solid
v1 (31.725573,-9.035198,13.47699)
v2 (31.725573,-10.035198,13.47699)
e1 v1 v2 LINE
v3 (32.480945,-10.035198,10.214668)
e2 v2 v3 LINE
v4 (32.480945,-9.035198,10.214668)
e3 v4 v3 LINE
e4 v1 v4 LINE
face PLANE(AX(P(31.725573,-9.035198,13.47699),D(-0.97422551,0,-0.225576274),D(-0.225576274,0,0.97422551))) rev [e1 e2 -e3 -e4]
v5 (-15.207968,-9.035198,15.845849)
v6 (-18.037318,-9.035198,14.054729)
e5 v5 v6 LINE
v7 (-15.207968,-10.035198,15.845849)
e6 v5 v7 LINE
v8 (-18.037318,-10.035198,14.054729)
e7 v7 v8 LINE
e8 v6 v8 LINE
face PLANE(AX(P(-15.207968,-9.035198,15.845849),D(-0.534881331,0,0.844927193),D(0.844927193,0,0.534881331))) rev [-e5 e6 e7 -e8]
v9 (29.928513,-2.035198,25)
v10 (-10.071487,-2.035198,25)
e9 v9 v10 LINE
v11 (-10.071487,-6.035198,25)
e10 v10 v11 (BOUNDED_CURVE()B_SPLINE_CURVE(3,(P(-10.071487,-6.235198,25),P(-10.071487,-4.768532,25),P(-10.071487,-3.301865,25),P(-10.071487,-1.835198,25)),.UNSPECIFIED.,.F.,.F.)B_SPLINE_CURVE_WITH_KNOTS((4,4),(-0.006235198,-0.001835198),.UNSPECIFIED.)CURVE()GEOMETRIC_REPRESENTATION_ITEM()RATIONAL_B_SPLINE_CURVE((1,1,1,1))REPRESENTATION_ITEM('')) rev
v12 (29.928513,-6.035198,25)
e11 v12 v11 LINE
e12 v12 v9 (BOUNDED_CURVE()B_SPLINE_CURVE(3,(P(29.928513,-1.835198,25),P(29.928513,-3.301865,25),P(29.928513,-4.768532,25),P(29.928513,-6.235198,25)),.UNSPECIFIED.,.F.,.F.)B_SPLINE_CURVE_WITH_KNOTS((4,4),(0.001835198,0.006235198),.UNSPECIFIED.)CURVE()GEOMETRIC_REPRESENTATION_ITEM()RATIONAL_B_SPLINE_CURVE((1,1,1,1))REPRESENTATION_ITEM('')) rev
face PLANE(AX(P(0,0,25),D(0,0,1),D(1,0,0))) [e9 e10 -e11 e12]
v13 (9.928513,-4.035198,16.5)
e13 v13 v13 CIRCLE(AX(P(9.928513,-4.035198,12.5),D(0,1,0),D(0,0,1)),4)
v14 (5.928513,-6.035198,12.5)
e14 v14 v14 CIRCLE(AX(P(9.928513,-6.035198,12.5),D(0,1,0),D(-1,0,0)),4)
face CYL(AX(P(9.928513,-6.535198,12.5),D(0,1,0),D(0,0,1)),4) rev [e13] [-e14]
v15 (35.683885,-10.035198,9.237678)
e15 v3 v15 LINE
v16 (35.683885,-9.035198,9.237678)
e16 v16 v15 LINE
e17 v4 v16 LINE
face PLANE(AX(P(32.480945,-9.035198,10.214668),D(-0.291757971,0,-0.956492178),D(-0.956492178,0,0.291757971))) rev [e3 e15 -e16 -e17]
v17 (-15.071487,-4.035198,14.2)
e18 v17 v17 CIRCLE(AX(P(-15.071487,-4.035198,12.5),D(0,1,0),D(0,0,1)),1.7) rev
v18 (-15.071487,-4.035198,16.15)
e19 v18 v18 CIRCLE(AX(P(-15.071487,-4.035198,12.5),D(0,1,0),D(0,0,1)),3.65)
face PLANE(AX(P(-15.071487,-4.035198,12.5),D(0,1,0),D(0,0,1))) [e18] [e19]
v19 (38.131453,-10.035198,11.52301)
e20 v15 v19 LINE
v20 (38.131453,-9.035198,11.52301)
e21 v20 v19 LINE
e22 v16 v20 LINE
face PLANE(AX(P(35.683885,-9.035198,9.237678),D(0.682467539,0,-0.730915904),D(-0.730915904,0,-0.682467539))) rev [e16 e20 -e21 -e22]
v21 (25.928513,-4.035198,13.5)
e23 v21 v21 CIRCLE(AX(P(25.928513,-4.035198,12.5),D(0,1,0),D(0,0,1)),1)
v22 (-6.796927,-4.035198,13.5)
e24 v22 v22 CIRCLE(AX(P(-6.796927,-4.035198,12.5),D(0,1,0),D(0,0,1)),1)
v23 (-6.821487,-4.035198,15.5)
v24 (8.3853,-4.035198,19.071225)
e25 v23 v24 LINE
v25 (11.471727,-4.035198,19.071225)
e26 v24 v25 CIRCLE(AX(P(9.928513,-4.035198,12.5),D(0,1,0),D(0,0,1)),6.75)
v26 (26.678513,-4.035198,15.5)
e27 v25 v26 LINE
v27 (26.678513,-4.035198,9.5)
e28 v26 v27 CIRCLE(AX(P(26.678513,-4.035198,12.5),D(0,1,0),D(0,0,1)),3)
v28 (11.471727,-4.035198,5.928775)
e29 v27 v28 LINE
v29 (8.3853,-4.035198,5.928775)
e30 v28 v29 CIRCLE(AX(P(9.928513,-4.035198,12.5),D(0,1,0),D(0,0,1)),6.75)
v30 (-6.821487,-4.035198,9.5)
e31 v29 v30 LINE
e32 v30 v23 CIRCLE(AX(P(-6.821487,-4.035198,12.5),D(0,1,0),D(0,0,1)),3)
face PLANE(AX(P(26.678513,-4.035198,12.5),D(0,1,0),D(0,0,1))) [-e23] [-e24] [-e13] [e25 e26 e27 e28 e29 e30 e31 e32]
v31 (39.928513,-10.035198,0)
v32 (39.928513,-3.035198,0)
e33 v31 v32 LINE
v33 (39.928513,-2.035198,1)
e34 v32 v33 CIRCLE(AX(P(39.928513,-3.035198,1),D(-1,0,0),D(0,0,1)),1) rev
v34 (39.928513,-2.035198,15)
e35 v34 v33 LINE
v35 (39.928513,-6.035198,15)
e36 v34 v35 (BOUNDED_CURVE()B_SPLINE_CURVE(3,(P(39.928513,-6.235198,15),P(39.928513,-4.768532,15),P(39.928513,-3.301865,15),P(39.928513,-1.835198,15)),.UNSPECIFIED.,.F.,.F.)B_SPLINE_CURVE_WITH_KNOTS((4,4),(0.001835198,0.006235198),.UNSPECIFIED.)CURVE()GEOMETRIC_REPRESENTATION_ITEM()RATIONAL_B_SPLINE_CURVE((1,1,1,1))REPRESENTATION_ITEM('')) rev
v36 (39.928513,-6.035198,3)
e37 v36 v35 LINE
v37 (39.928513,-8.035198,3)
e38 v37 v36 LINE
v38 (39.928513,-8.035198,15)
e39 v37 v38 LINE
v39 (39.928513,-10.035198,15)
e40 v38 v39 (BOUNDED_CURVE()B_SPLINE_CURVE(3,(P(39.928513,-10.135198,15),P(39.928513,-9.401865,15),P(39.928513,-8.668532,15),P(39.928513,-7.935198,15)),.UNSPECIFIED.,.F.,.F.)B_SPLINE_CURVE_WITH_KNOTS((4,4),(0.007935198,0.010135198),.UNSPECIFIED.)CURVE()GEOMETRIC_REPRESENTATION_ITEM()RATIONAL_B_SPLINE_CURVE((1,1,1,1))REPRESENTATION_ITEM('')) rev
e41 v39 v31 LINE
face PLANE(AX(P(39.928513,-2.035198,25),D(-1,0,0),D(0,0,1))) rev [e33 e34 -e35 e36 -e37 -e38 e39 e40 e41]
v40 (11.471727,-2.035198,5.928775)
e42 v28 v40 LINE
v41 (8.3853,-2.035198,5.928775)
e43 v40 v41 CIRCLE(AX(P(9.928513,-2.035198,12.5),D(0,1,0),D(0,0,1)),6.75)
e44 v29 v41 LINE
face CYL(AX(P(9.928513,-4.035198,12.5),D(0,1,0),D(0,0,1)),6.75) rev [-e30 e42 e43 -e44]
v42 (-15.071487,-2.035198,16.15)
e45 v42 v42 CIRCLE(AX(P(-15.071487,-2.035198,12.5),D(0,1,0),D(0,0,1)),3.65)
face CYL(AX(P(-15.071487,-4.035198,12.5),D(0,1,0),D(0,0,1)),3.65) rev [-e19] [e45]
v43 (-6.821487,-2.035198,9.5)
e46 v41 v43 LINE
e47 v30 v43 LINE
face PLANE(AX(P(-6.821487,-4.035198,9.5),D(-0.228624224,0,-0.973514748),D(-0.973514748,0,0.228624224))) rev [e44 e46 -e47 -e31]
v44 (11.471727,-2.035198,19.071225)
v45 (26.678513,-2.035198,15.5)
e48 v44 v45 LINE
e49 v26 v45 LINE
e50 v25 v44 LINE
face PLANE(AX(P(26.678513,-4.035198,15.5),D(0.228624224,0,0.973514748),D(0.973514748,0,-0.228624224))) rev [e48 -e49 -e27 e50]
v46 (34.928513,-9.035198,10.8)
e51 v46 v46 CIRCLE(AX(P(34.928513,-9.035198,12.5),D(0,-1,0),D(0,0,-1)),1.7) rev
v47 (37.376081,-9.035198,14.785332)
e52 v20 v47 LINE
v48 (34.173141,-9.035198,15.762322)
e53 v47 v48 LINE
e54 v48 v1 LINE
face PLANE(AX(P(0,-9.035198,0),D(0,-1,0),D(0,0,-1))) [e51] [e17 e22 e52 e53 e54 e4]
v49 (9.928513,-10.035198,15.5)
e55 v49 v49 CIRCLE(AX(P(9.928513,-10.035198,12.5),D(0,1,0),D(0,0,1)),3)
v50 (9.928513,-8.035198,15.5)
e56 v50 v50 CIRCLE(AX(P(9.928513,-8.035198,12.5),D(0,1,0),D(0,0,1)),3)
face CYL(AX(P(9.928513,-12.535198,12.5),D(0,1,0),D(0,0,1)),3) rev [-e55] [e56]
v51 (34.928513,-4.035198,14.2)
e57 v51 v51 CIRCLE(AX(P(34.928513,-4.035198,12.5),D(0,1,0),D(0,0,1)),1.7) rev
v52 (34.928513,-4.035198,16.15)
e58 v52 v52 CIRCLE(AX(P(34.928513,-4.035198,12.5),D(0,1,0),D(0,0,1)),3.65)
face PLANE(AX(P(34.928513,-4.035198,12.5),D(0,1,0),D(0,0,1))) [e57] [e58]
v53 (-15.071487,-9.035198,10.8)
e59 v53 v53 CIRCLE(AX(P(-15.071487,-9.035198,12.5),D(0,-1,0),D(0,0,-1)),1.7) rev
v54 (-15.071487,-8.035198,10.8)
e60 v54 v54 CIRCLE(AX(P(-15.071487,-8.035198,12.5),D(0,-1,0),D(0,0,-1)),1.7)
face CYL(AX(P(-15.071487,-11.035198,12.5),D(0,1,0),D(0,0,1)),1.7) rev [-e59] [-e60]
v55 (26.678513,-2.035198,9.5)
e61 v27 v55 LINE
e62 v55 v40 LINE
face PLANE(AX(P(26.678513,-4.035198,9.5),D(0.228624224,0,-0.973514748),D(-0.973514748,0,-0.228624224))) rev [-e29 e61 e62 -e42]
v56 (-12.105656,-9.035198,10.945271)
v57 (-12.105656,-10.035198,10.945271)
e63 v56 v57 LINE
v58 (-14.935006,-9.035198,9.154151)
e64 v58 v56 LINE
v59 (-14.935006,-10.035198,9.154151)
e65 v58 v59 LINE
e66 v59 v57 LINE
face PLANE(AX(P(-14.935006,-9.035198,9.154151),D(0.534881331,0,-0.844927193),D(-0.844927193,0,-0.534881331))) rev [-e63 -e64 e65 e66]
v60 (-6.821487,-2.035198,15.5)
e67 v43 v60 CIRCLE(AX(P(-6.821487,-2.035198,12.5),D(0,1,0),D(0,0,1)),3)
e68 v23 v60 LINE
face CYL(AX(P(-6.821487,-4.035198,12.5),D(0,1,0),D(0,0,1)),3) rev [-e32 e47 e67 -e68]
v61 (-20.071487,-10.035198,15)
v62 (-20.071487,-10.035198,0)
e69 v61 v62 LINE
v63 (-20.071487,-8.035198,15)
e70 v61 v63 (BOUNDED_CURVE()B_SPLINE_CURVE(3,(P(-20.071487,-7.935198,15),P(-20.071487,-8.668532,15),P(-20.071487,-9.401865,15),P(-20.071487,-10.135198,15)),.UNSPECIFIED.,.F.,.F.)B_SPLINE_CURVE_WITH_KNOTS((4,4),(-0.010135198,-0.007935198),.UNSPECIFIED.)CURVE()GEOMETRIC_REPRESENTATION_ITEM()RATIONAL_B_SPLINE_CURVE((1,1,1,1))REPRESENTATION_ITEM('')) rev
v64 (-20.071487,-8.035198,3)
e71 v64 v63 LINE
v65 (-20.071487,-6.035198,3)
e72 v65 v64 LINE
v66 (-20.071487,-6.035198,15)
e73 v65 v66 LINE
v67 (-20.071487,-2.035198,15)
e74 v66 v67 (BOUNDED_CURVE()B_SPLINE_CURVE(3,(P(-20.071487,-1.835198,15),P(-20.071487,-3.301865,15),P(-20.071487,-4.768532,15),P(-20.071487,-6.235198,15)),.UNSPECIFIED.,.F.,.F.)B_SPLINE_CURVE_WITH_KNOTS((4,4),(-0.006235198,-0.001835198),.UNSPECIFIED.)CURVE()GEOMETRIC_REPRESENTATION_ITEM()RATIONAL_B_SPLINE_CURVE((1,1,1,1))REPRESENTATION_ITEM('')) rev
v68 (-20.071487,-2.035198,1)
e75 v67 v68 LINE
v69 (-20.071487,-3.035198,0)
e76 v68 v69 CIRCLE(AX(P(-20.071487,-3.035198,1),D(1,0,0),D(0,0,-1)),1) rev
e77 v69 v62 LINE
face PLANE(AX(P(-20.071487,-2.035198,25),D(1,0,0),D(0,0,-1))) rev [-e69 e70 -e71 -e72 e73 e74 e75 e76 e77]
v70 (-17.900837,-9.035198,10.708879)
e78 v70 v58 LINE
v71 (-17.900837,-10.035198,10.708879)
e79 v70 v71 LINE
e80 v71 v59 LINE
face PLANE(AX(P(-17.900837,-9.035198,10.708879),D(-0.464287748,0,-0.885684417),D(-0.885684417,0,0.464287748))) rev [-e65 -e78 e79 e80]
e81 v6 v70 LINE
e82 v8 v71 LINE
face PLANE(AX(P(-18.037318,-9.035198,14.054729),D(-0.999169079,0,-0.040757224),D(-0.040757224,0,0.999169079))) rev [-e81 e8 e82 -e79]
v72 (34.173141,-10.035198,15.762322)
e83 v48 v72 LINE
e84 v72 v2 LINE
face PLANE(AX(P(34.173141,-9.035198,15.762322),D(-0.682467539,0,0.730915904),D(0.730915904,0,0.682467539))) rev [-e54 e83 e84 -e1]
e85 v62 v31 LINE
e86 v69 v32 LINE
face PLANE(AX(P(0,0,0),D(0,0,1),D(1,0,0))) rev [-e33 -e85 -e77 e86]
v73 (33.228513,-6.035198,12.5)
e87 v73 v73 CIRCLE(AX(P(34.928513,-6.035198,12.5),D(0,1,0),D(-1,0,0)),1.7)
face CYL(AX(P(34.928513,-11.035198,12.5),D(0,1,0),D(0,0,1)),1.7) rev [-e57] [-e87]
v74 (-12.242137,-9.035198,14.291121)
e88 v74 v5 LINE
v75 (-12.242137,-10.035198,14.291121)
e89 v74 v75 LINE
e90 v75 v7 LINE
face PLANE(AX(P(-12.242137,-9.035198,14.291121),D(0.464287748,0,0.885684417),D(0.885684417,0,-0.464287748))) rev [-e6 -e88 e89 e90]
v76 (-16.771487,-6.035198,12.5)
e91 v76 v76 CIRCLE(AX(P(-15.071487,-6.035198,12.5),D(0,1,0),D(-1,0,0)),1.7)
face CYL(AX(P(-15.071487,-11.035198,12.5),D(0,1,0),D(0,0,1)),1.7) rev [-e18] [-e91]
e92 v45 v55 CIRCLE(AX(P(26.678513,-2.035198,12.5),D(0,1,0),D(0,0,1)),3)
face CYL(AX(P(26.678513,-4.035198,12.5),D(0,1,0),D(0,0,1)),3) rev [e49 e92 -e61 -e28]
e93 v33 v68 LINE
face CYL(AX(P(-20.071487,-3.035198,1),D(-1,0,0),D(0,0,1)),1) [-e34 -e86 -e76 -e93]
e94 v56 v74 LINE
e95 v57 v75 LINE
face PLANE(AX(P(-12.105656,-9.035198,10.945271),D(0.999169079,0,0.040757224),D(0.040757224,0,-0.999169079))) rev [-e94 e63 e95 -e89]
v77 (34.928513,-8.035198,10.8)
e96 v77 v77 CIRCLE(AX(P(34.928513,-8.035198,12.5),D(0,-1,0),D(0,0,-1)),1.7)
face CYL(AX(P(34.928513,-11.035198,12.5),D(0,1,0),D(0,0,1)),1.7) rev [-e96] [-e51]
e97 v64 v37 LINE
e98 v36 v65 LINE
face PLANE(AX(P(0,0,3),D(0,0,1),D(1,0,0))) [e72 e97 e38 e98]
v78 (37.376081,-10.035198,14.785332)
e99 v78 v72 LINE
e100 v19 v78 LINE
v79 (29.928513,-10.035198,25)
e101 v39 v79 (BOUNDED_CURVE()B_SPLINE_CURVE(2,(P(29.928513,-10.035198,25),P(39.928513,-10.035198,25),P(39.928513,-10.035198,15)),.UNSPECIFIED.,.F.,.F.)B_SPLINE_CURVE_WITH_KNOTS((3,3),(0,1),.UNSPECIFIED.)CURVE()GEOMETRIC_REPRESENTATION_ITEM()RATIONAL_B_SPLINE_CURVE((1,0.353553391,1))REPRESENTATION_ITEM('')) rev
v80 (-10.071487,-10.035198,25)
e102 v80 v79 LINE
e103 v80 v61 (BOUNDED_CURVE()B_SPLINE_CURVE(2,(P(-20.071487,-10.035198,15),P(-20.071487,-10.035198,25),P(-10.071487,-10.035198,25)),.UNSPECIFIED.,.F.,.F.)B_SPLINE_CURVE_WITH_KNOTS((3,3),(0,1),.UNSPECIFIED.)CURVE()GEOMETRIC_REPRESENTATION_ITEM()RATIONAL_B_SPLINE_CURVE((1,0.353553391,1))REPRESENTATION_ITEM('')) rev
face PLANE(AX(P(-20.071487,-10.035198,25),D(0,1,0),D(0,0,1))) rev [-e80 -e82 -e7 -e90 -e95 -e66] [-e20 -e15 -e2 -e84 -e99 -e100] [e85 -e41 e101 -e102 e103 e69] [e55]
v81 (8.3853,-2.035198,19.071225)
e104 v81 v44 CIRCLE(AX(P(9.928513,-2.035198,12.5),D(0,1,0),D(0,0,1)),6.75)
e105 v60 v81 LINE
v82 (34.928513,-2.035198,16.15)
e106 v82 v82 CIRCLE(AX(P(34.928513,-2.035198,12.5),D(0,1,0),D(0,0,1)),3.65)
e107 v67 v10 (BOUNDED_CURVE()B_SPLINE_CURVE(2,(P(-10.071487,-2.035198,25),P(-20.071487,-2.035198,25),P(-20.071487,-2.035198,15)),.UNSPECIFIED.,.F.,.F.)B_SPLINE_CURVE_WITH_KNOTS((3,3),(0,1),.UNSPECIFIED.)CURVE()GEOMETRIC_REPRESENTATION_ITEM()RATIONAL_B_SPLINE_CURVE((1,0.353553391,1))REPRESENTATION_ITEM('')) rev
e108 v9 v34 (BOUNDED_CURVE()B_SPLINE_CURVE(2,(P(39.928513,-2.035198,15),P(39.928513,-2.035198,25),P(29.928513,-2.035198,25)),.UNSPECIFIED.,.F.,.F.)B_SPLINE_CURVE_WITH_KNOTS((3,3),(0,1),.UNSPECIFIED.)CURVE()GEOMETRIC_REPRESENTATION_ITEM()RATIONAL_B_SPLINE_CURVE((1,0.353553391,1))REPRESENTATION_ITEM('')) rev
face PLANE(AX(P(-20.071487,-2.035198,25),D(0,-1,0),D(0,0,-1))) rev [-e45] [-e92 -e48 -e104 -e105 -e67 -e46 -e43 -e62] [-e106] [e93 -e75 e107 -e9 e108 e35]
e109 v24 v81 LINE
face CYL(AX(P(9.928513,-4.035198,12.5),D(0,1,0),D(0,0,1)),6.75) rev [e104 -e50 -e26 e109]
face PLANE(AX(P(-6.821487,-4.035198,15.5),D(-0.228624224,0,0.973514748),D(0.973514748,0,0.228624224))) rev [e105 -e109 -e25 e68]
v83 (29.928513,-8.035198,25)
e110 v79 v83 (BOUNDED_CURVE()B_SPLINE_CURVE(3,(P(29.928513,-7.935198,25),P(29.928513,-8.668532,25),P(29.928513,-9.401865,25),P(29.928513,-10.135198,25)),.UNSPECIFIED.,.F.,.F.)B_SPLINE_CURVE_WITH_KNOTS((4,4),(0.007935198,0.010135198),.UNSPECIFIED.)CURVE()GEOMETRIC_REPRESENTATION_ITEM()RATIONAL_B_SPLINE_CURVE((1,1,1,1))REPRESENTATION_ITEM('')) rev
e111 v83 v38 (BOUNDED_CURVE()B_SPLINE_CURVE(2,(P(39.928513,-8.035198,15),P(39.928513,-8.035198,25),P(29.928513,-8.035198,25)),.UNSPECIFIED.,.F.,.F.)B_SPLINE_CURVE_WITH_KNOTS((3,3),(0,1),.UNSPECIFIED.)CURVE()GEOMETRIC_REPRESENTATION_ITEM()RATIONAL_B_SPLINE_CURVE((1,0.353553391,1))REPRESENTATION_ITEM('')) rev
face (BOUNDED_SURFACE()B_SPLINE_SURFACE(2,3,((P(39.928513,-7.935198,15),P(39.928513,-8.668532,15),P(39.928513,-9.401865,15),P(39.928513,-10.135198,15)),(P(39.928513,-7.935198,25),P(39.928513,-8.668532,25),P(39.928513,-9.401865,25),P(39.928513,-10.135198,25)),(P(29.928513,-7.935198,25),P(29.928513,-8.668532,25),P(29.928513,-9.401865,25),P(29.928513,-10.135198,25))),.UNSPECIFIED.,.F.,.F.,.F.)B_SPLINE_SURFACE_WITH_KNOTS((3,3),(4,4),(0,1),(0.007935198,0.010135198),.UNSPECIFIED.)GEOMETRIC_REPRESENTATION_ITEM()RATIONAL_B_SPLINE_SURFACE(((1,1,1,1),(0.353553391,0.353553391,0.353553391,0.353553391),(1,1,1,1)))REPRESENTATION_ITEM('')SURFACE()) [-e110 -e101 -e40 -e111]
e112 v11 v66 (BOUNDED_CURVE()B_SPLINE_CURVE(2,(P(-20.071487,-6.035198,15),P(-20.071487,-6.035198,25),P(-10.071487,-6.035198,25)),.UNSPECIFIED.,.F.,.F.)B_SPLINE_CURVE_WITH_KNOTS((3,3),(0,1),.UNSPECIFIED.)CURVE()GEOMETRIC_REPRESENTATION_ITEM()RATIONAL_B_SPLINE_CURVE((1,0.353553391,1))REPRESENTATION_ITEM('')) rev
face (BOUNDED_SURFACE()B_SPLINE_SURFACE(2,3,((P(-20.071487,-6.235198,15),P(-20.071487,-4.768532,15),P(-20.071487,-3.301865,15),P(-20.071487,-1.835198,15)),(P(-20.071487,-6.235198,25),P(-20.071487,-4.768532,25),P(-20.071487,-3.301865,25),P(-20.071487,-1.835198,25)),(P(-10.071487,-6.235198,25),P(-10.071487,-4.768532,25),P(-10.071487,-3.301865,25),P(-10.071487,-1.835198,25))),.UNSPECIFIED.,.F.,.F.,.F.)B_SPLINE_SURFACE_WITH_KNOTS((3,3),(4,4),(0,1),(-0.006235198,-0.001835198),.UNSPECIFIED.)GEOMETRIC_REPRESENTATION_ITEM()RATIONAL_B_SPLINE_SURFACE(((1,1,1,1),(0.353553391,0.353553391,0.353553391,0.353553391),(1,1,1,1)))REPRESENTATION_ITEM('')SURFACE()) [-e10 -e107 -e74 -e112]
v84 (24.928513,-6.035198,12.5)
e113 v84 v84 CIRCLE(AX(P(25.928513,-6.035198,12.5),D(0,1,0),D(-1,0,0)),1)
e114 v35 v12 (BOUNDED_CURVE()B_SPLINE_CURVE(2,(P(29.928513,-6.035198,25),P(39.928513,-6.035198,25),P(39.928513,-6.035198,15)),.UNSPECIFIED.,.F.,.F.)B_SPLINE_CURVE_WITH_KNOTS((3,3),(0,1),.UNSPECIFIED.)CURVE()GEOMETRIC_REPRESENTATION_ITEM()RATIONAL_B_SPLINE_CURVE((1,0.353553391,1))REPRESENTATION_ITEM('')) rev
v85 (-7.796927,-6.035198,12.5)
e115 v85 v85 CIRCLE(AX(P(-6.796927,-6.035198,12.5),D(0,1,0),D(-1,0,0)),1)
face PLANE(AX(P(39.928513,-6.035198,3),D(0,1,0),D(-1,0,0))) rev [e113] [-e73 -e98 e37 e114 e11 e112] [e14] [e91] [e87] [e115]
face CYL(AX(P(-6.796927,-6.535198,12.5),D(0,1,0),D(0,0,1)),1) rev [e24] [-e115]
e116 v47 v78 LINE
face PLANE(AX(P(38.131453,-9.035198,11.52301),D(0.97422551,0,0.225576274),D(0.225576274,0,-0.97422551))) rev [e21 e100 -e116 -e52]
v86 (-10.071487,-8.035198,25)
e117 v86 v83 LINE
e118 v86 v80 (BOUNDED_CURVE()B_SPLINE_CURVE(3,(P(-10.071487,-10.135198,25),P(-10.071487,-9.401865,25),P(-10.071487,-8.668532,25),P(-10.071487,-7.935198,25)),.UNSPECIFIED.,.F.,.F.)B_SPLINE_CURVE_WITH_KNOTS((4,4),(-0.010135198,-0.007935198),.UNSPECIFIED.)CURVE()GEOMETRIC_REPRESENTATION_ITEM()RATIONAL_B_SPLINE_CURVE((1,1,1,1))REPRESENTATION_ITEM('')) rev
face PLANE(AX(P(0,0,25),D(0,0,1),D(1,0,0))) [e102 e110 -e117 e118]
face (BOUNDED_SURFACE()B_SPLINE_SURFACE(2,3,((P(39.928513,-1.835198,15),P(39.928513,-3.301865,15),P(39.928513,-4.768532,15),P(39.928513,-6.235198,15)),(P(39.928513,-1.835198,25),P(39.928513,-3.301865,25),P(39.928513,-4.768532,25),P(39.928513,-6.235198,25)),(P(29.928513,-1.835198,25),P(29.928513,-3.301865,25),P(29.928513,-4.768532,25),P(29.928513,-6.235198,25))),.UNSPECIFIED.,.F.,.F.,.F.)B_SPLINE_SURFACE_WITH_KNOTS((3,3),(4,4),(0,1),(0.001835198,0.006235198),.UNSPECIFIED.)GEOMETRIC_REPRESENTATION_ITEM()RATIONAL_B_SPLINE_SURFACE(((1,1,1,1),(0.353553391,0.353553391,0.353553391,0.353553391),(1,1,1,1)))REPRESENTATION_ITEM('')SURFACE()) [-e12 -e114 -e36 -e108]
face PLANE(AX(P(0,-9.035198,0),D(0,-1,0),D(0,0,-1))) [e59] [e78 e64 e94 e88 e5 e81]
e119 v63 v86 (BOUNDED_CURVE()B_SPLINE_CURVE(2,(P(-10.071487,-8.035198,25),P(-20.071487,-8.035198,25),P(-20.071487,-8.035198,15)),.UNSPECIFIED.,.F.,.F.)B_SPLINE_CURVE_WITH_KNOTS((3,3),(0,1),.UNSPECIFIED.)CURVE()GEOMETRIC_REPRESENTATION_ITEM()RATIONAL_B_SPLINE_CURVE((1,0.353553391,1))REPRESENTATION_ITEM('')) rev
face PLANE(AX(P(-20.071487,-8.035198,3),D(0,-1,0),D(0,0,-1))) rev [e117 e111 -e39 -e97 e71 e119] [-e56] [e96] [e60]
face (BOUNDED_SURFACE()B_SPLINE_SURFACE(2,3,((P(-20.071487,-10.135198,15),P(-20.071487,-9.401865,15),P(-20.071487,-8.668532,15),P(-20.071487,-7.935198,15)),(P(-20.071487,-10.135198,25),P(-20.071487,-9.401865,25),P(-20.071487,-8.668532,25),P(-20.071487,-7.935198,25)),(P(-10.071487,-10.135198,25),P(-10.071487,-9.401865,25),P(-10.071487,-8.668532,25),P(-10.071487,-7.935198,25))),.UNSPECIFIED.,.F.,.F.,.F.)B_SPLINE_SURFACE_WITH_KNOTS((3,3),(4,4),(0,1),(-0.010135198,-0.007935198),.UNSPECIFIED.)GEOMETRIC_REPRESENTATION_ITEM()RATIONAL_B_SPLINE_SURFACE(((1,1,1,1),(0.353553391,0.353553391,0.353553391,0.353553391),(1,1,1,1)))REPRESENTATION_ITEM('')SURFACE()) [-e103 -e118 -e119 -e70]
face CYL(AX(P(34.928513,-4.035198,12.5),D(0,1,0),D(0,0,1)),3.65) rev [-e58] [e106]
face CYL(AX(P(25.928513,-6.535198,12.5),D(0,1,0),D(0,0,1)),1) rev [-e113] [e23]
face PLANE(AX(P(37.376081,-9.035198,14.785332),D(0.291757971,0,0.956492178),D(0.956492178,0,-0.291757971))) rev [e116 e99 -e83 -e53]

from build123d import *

# Parameters (mm, degrees)
SKETCH1_W           = 60
SKETCH1_H           = 8
BOSS_EXTRUDE1_DEPTH = 25
SKETCH2_W           = 60
SKETCH2_H           = 2
CUT_EXTRUDE1_DEPTH  = 22
CUT_EXTRUDE2_DEPTH  = 2
SKETCH4_R           = 1
SKETCH4_R_2         = 4
CUT_EXTRUDE3_DEPTH  = 2.5
SKETCH5_R           = 1.7
CUT_EXTRUDE4_DEPTH  = 9
FILLET1_R           = 1
FILLET2_SIZE        = 10
SKETCH6_R           = 3
CUT_EXTRUDE5_DEPTH  = 4.5
CUT_EXTRUDE6_DEPTH  = 1
SKETCH8_R           = 3.65
CUT_EXTRUDE7_DEPTH  = 2


with BuildPart() as part:
    # Sketch1 → Boss-Extrude1 (new body)
    with BuildSketch(Plane.XY):
        with Locations((9.92851316, -6.03519833)):
            Rectangle(SKETCH1_W, SKETCH1_H)
    extrude(amount=BOSS_EXTRUDE1_DEPTH)

    # Sketch2 → Cut-Extrude1 (cut)
    with BuildSketch(Plane.XY.offset(25)):
        with Locations((9.92851316, -7.03519833)):
            Rectangle(SKETCH2_W, SKETCH2_H)
    extrude(amount=-CUT_EXTRUDE1_DEPTH, mode=Mode.SUBTRACT)

    # Sketch3 → Cut-Extrude2 (cut)
    with BuildSketch(Plane(origin=(0, -2.03519833, 0), x_dir=(1, 0, 0), z_dir=(0, 1, 0))):
        with BuildLine():
            Line((26.67851316, -9.5), (11.471726674, -5.928775453))
            ThreePointArc((11.471726674, -5.928775453), (9.92851316, -5.75), (8.385299646, -5.928775453))
            Line((8.385299646, -5.928775453), (-6.82148684, -9.5))
            ThreePointArc((-6.82148684, -9.5), (-9.821486841, -12.5), (-6.82148684, -15.5))
            Line((-6.82148684, -15.5), (8.385299646, -19.071224547))
            ThreePointArc((8.385299646, -19.071224547), (9.92851316, -19.25), (11.471726674, -19.071224547))
            Line((11.471726674, -19.071224547), (26.67851316, -15.5))
            ThreePointArc((26.67851316, -15.5), (29.67851316, -12.5), (26.67851316, -9.5))
        make_face()
    extrude(amount=-CUT_EXTRUDE2_DEPTH, mode=Mode.SUBTRACT)

    # Sketch4 → Cut-Extrude3 (cut)
    with BuildSketch(Plane(origin=(0, -4.03519833, 0), x_dir=(1, 0, 0), z_dir=(0, 1, 0))):
        with Locations(Location((-6.796927173, -12.5, 0), (0, 0, 270))):
            Circle(SKETCH4_R)
        with Locations(Location((9.92851316, -12.5, 0), (0, 0, 270))):
            Circle(SKETCH4_R_2)
        with Locations(Location((25.92851316, -12.5, 0), (0, 0, 270))):
            Circle(SKETCH4_R)
    extrude(amount=-CUT_EXTRUDE3_DEPTH, mode=Mode.SUBTRACT)

    # Sketch5 → Cut-Extrude4 (cut)
    with BuildSketch(Plane(origin=(0, -2.03519833, 0), x_dir=(1, 0, 0), z_dir=(0, 1, 0))):
        with Locations(Location((34.92851316, -12.5, 0), (0, 0, 270))):
            Circle(SKETCH5_R)
        with Locations(Location((-15.07148684, -12.5, 0), (0, 0, 270))):
            Circle(SKETCH5_R)
    extrude(amount=-CUT_EXTRUDE4_DEPTH, mode=Mode.SUBTRACT)

    # Fillet1
    fillet1_edges = [part.edges().sort_by_distance(p)[0] for p in [
        (9.92851316, -2.03519833, 0),
    ]]
    fillet(fillet1_edges, radius=FILLET1_R)

    # Fillet2
    # a fillet whose section is not a circle: 10 mm, written as the material it takes off along each edge
    with BuildSketch(Plane(origin=(-20.07148684, -31.03519833, 25), x_dir=(0, 0, -1), z_dir=(0, 1, 0))) as fillet2_piece_1:
        with BuildLine():
            Bezier((FILLET2_SIZE, 0), (0, 0), (0, -FILLET2_SIZE), weights=[1, 0.353553391, 1])
            Line((0, -FILLET2_SIZE), (0, 0))
            Line((0, 0), (FILLET2_SIZE, 0))
        make_face()
    extrude(amount=54, mode=Mode.SUBTRACT)
    with BuildSketch(Plane(origin=(-20.07148684, -35.03519833, 25), x_dir=(0, 0, -1), z_dir=(0, 1, 0)), Plane(origin=(39.92851316, 16.96480167, 25), x_dir=(0, 0, -1), z_dir=(0, -1, 0))) as fillet2_piece_2:
        with BuildLine():
            Bezier((FILLET2_SIZE, 0), (0, 0), (0, -FILLET2_SIZE), weights=[1, 0.353553391, 1])
            Line((0, -FILLET2_SIZE), (0, 0))
            Line((0, 0), (FILLET2_SIZE, 0))
        make_face()
    extrude(amount=52, mode=Mode.SUBTRACT)
    with BuildSketch(Plane(origin=(39.92851316, 22.96480167, 25), x_dir=(-1, 0, 0), z_dir=(0, -1, 0))) as fillet2_piece_3:
        with BuildLine():
            Bezier((FILLET2_SIZE, 0), (0, 0), (0, FILLET2_SIZE), weights=[1, 0.353553391, 1])
            Line((0, FILLET2_SIZE), (0, 0))
            Line((0, 0), (FILLET2_SIZE, 0))
        make_face()
    extrude(amount=54, mode=Mode.SUBTRACT)

    # Sketch6 → Cut-Extrude5 (cut)
    with BuildSketch(Plane(origin=(0, -8.03519833, 0), x_dir=(1, 0, 0), z_dir=(0, 1, 0))):
        with Locations(Location((9.92851316, -12.5, 0), (0, 0, 270))):
            Circle(SKETCH6_R)
    extrude(amount=-CUT_EXTRUDE5_DEPTH, mode=Mode.SUBTRACT)

    # Sketch7 → Cut-Extrude6 (cut)
    with BuildSketch(Plane(origin=(0, -10.03519833, 0), x_dir=(-1, 0, 0), z_dir=(0, -1, 0))):
        Polygon((-35.683884991, -9.237677709), (-38.131453055, -11.52301005), (-37.376081224, -14.785332341), (-34.173141329, -15.762322291), (-31.725573265, -13.47698995), (-32.480945096, -10.214667659), align=None)
        Polygon((12.105656047, -10.945271393), (12.242136974, -14.291120506), (15.207967766, -15.845849113), (18.037317633, -14.054728607), (17.900836706, -10.708879494), (14.935005914, -9.154150887), align=None)
    extrude(amount=-CUT_EXTRUDE6_DEPTH, mode=Mode.SUBTRACT)

    # Sketch8 → Cut-Extrude7 (cut)
    with BuildSketch(Plane(origin=(0, -2.03519833, 0), x_dir=(1, 0, 0), z_dir=(0, 1, 0))):
        with Locations(Location((-15.07148684, -12.5, 0), (0, 0, 270))):
            Circle(SKETCH8_R)
        with Locations(Location((34.92851316, -12.5, 0), (0, 0, 270))):
            Circle(SKETCH8_R)
    extrude(amount=-CUT_EXTRUDE7_DEPTH, mode=Mode.SUBTRACT)


solid = part.part
